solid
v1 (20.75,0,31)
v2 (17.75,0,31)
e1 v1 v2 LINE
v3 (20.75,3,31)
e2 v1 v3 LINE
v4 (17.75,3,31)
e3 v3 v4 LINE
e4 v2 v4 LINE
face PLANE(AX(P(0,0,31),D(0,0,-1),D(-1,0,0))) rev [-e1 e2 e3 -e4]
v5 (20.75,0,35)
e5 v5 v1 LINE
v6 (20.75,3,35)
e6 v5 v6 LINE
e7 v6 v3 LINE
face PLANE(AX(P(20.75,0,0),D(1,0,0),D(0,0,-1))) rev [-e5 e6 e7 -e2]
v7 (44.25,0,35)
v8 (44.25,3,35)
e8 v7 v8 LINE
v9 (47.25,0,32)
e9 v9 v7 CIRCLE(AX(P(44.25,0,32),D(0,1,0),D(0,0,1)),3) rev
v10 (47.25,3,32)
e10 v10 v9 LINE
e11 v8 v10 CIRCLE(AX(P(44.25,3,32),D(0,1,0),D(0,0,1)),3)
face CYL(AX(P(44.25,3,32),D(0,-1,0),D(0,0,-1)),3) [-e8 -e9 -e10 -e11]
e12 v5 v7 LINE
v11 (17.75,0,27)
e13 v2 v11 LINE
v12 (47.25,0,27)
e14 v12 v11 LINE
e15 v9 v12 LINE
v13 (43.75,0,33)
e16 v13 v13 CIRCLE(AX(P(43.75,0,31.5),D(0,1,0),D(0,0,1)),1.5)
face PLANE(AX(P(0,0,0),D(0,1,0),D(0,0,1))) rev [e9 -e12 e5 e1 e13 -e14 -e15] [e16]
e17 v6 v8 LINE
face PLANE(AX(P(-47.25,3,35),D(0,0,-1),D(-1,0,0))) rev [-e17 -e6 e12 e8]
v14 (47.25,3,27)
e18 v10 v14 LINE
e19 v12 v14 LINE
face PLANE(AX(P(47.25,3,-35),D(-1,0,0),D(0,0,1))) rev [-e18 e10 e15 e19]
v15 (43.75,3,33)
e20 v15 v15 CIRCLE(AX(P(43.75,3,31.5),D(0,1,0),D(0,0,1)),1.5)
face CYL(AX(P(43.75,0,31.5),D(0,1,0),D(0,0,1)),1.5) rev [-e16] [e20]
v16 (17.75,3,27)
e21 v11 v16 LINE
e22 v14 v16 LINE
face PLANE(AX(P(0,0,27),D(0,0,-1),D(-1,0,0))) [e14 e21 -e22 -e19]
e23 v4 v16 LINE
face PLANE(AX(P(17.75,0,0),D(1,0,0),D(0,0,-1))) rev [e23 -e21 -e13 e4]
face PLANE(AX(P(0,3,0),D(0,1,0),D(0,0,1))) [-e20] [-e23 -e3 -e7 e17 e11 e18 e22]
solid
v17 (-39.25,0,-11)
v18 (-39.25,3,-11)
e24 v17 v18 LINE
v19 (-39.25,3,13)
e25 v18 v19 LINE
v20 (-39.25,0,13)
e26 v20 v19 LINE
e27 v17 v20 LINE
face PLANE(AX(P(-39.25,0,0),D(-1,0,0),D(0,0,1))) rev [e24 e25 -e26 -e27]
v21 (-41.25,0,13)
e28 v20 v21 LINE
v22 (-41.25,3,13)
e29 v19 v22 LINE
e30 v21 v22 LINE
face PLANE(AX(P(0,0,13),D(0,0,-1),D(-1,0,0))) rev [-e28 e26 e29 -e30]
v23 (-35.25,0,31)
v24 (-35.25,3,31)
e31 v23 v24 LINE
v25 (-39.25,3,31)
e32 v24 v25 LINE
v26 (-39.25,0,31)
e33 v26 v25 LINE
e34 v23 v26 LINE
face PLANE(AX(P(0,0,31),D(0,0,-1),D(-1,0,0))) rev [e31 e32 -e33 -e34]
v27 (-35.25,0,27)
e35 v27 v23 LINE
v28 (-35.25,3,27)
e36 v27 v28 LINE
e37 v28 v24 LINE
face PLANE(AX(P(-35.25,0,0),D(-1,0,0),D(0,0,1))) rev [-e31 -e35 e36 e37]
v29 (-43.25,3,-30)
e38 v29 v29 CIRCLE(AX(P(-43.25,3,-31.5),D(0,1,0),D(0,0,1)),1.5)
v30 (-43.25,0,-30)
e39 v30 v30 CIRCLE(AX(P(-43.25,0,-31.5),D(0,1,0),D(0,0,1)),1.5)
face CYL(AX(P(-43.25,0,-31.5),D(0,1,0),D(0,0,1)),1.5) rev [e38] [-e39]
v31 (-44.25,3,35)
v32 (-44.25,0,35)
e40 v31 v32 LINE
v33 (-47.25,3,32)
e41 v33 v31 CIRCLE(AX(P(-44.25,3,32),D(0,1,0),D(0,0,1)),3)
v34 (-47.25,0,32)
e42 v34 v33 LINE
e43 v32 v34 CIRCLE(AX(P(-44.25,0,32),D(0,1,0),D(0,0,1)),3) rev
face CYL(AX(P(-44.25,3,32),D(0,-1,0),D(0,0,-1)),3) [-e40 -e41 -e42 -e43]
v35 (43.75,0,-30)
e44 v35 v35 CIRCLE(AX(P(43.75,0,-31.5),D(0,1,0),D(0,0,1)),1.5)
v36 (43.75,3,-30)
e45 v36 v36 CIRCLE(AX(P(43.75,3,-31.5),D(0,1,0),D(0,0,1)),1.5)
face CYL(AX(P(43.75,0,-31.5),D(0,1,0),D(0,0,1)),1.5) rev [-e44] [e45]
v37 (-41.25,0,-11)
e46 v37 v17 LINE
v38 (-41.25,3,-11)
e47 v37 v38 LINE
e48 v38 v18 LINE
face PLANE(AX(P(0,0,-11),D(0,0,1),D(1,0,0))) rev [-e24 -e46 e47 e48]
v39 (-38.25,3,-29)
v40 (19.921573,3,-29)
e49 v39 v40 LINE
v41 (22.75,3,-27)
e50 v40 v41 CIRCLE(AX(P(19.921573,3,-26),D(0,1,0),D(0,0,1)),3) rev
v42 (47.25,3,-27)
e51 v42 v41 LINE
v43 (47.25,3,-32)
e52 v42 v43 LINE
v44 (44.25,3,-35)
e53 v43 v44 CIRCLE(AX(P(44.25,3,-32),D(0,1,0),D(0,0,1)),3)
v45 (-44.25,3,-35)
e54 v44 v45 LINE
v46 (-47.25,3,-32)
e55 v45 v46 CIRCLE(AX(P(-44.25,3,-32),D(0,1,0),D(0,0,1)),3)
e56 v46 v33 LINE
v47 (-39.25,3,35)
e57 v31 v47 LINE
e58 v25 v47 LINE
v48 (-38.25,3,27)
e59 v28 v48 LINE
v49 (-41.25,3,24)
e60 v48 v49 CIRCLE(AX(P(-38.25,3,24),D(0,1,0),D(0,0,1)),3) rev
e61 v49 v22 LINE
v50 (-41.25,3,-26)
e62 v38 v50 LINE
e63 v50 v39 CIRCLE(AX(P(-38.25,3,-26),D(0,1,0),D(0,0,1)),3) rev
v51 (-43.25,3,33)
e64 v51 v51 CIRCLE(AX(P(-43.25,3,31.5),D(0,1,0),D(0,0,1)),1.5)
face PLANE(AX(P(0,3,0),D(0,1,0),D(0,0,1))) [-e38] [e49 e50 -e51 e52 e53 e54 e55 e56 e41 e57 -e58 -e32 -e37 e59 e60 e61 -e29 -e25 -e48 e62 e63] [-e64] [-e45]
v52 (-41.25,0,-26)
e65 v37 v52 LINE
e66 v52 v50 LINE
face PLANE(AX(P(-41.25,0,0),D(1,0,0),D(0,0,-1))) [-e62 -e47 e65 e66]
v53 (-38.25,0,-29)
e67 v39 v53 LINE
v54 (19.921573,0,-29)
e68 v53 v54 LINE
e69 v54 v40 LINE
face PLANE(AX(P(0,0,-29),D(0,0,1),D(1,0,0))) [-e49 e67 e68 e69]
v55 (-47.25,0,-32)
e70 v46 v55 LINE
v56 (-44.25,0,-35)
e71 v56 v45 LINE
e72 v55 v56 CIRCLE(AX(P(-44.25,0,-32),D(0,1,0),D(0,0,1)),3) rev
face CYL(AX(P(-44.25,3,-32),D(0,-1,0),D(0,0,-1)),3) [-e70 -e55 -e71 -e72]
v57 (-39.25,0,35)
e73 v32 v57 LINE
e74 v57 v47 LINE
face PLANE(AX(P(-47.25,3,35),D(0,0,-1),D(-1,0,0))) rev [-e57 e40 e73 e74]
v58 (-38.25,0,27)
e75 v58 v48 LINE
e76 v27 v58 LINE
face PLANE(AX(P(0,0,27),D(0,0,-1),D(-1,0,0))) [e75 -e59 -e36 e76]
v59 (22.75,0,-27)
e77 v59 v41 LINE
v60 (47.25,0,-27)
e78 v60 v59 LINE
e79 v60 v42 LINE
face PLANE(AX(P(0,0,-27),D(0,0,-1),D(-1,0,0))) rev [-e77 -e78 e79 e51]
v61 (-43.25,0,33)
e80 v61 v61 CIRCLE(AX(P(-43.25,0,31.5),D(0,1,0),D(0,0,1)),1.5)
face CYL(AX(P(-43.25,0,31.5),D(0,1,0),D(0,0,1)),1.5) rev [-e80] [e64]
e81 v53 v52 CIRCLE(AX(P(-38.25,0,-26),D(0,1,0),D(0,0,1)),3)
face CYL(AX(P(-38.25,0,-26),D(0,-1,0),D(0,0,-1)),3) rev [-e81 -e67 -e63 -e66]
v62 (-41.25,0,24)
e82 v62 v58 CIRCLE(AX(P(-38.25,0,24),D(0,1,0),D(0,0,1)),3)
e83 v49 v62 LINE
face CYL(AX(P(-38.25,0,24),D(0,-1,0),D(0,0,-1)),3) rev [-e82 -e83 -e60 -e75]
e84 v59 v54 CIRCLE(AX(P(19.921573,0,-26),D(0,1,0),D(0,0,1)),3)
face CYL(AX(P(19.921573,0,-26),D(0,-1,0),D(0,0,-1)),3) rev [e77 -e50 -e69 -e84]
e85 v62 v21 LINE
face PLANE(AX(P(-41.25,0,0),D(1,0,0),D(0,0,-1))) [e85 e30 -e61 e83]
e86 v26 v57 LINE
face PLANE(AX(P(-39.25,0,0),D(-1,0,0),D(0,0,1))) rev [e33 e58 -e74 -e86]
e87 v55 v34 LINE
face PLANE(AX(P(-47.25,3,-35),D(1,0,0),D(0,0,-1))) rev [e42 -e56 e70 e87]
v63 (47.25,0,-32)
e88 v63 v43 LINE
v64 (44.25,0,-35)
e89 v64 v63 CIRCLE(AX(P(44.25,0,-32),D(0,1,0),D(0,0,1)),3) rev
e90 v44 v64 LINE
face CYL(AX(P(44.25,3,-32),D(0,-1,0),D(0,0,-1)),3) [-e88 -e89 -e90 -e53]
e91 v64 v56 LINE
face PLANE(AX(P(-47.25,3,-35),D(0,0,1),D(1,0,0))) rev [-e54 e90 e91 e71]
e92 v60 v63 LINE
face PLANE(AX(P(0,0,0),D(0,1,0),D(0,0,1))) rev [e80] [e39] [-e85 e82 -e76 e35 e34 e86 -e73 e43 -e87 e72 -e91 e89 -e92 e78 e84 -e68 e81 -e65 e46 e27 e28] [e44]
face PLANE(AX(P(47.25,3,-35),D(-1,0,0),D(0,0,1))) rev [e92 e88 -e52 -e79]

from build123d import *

# Parameters (mm, degrees)
SKETCH1_W           = 94.5
SKETCH1_H           = 70
BOSS_EXTRUDE1_DEPTH = 3
SKETCH3_R           = 1.5
CUT_EXTRUDE2_DEPTH  = 59.877521177
FILLET2_R           = 3
SKETCH5_W           = 24.5
SKETCH5_H           = 54
CUT_EXTRUDE3_DEPTH  = 59.877521177
FILLET3_R           = 3


with BuildPart() as part:
    # Sketch1 → Boss-Extrude1 (new body)
    with BuildSketch(Plane(origin=(0, 0, 0), x_dir=(1, 0, 0), z_dir=(0, 1, 0))):
        Rectangle(SKETCH1_W, SKETCH1_H)
    extrude(amount=BOSS_EXTRUDE1_DEPTH)

    # Sketch3 → Cut-Extrude2 (cut, through all)
    with BuildSketch(Plane(origin=(0, 3, 0), x_dir=(1, 0, 0), z_dir=(0, 1, 0))):
        with Locations(Location((43.75, 31.5, 0), (0, 0, 270))):
            Circle(SKETCH3_R)
        with Locations(Location((-43.25, 31.5, 0), (0, 0, 270))):
            Circle(SKETCH3_R)
        with Locations(Location((-43.25, -31.5, 0), (0, 0, 270))):
            Circle(SKETCH3_R)
        with Locations(Location((43.75, -31.5, 0), (0, 0, 270))):
            Circle(SKETCH3_R)
    extrude(amount=-CUT_EXTRUDE2_DEPTH, mode=Mode.SUBTRACT)

    # Fillet2
    fillet2_edges = [part.edges().sort_by_distance(p)[0] for p in [
        (47.25, 1.5, 35),
        (-47.25, 1.5, 35),
        (-47.25, 1.5, -35),
        (47.25, 1.5, -35),
    ]]
    fillet(fillet2_edges, radius=FILLET2_R)

    # Sketch5 → Cut-Extrude3 (cut, through all)
    with BuildSketch(Plane(origin=(0, 3, 0), x_dir=(1, 0, 0), z_dir=(0, 1, 0))):
        Polygon((22.75, 29), (-41.25, 29), (-41.25, 11), (-39.25, 11), (-39.25, -13), (-41.25, -13), (-41.25, -27), (-35.25, -27), (17.75, -27), (22.75, -27), (22.75, 27), align=None)
        Polygon((17.75, -31), (17.75, -27), (-35.25, -27), (-35.25, -31), (-39.25, -31), (-39.25, -35), (20.75, -35), (20.75, -31), align=None)
        with Locations((35, 0)):
            Rectangle(SKETCH5_W, SKETCH5_H)
    extrude(amount=-CUT_EXTRUDE3_DEPTH, mode=Mode.SUBTRACT)


with BuildPart() as cut_extrude3_piece_1:
    # of the separate pieces the step leaves, piece 1, a body of its own (cut_extrude3_pieces)
    add(part.part.solids().sort_by_distance((-44.25, 0, -35))[0])

    # Fillet3
    # the kernel refuses this fillet: 3 mm, written as the material it adds along each edge
    with BuildSketch(Plane(origin=(22.75, 3, -29), x_dir=(-1, 0, 0), z_dir=(0, -1, 0))) as fillet3_piece_1:
        with BuildLine():
            CenterArc((2.828427125, -3), FILLET3_R, 90, 70.528779366)
            Line((0, -2), (-0.056568542, -1.98))
            ThreePointArc((-0.056568542, -1.98), (-0.06, -1), (-0.06, 0))
            Line((-0.06, 0), (0, 0.06))
            Line((0, 0.06), (2.828427125, 0.06))
            Line((2.828427125, 0.06), (2.828427125, 0))
        make_face()
    extrude(amount=3)
    with BuildSketch(Plane(origin=(-41.25, 3, 27), x_dir=(1, 0, 0), z_dir=(0, -1, 0)), Plane(origin=(-41.25, 3, -29), x_dir=(0, 0, 1), z_dir=(0, -1, 0))) as fillet3_piece_2:
        with BuildLine():
            CenterArc((FILLET3_R, -FILLET3_R), FILLET3_R, 90, 90)
            Line((0, -FILLET3_R), (-FILLET3_R * 0.02, -FILLET3_R))
            Line((-FILLET3_R * 0.02, -FILLET3_R), (-FILLET3_R * 0.02, FILLET3_R * 0.02))
            Line((-FILLET3_R * 0.02, FILLET3_R * 0.02), (FILLET3_R, FILLET3_R * 0.02))
            Line((FILLET3_R, FILLET3_R * 0.02), (FILLET3_R, 0))
        make_face()
    extrude(amount=3)


with BuildPart() as cut_extrude3_piece_2:
    # of the separate pieces the step leaves, piece 2, a body of its own (cut_extrude3_pieces)
    add(part.part.solids().sort_by_distance((47.25, 0, 27))[0])


solid = Compound([cut_extrude3_piece_1.part, cut_extrude3_piece_2.part])
